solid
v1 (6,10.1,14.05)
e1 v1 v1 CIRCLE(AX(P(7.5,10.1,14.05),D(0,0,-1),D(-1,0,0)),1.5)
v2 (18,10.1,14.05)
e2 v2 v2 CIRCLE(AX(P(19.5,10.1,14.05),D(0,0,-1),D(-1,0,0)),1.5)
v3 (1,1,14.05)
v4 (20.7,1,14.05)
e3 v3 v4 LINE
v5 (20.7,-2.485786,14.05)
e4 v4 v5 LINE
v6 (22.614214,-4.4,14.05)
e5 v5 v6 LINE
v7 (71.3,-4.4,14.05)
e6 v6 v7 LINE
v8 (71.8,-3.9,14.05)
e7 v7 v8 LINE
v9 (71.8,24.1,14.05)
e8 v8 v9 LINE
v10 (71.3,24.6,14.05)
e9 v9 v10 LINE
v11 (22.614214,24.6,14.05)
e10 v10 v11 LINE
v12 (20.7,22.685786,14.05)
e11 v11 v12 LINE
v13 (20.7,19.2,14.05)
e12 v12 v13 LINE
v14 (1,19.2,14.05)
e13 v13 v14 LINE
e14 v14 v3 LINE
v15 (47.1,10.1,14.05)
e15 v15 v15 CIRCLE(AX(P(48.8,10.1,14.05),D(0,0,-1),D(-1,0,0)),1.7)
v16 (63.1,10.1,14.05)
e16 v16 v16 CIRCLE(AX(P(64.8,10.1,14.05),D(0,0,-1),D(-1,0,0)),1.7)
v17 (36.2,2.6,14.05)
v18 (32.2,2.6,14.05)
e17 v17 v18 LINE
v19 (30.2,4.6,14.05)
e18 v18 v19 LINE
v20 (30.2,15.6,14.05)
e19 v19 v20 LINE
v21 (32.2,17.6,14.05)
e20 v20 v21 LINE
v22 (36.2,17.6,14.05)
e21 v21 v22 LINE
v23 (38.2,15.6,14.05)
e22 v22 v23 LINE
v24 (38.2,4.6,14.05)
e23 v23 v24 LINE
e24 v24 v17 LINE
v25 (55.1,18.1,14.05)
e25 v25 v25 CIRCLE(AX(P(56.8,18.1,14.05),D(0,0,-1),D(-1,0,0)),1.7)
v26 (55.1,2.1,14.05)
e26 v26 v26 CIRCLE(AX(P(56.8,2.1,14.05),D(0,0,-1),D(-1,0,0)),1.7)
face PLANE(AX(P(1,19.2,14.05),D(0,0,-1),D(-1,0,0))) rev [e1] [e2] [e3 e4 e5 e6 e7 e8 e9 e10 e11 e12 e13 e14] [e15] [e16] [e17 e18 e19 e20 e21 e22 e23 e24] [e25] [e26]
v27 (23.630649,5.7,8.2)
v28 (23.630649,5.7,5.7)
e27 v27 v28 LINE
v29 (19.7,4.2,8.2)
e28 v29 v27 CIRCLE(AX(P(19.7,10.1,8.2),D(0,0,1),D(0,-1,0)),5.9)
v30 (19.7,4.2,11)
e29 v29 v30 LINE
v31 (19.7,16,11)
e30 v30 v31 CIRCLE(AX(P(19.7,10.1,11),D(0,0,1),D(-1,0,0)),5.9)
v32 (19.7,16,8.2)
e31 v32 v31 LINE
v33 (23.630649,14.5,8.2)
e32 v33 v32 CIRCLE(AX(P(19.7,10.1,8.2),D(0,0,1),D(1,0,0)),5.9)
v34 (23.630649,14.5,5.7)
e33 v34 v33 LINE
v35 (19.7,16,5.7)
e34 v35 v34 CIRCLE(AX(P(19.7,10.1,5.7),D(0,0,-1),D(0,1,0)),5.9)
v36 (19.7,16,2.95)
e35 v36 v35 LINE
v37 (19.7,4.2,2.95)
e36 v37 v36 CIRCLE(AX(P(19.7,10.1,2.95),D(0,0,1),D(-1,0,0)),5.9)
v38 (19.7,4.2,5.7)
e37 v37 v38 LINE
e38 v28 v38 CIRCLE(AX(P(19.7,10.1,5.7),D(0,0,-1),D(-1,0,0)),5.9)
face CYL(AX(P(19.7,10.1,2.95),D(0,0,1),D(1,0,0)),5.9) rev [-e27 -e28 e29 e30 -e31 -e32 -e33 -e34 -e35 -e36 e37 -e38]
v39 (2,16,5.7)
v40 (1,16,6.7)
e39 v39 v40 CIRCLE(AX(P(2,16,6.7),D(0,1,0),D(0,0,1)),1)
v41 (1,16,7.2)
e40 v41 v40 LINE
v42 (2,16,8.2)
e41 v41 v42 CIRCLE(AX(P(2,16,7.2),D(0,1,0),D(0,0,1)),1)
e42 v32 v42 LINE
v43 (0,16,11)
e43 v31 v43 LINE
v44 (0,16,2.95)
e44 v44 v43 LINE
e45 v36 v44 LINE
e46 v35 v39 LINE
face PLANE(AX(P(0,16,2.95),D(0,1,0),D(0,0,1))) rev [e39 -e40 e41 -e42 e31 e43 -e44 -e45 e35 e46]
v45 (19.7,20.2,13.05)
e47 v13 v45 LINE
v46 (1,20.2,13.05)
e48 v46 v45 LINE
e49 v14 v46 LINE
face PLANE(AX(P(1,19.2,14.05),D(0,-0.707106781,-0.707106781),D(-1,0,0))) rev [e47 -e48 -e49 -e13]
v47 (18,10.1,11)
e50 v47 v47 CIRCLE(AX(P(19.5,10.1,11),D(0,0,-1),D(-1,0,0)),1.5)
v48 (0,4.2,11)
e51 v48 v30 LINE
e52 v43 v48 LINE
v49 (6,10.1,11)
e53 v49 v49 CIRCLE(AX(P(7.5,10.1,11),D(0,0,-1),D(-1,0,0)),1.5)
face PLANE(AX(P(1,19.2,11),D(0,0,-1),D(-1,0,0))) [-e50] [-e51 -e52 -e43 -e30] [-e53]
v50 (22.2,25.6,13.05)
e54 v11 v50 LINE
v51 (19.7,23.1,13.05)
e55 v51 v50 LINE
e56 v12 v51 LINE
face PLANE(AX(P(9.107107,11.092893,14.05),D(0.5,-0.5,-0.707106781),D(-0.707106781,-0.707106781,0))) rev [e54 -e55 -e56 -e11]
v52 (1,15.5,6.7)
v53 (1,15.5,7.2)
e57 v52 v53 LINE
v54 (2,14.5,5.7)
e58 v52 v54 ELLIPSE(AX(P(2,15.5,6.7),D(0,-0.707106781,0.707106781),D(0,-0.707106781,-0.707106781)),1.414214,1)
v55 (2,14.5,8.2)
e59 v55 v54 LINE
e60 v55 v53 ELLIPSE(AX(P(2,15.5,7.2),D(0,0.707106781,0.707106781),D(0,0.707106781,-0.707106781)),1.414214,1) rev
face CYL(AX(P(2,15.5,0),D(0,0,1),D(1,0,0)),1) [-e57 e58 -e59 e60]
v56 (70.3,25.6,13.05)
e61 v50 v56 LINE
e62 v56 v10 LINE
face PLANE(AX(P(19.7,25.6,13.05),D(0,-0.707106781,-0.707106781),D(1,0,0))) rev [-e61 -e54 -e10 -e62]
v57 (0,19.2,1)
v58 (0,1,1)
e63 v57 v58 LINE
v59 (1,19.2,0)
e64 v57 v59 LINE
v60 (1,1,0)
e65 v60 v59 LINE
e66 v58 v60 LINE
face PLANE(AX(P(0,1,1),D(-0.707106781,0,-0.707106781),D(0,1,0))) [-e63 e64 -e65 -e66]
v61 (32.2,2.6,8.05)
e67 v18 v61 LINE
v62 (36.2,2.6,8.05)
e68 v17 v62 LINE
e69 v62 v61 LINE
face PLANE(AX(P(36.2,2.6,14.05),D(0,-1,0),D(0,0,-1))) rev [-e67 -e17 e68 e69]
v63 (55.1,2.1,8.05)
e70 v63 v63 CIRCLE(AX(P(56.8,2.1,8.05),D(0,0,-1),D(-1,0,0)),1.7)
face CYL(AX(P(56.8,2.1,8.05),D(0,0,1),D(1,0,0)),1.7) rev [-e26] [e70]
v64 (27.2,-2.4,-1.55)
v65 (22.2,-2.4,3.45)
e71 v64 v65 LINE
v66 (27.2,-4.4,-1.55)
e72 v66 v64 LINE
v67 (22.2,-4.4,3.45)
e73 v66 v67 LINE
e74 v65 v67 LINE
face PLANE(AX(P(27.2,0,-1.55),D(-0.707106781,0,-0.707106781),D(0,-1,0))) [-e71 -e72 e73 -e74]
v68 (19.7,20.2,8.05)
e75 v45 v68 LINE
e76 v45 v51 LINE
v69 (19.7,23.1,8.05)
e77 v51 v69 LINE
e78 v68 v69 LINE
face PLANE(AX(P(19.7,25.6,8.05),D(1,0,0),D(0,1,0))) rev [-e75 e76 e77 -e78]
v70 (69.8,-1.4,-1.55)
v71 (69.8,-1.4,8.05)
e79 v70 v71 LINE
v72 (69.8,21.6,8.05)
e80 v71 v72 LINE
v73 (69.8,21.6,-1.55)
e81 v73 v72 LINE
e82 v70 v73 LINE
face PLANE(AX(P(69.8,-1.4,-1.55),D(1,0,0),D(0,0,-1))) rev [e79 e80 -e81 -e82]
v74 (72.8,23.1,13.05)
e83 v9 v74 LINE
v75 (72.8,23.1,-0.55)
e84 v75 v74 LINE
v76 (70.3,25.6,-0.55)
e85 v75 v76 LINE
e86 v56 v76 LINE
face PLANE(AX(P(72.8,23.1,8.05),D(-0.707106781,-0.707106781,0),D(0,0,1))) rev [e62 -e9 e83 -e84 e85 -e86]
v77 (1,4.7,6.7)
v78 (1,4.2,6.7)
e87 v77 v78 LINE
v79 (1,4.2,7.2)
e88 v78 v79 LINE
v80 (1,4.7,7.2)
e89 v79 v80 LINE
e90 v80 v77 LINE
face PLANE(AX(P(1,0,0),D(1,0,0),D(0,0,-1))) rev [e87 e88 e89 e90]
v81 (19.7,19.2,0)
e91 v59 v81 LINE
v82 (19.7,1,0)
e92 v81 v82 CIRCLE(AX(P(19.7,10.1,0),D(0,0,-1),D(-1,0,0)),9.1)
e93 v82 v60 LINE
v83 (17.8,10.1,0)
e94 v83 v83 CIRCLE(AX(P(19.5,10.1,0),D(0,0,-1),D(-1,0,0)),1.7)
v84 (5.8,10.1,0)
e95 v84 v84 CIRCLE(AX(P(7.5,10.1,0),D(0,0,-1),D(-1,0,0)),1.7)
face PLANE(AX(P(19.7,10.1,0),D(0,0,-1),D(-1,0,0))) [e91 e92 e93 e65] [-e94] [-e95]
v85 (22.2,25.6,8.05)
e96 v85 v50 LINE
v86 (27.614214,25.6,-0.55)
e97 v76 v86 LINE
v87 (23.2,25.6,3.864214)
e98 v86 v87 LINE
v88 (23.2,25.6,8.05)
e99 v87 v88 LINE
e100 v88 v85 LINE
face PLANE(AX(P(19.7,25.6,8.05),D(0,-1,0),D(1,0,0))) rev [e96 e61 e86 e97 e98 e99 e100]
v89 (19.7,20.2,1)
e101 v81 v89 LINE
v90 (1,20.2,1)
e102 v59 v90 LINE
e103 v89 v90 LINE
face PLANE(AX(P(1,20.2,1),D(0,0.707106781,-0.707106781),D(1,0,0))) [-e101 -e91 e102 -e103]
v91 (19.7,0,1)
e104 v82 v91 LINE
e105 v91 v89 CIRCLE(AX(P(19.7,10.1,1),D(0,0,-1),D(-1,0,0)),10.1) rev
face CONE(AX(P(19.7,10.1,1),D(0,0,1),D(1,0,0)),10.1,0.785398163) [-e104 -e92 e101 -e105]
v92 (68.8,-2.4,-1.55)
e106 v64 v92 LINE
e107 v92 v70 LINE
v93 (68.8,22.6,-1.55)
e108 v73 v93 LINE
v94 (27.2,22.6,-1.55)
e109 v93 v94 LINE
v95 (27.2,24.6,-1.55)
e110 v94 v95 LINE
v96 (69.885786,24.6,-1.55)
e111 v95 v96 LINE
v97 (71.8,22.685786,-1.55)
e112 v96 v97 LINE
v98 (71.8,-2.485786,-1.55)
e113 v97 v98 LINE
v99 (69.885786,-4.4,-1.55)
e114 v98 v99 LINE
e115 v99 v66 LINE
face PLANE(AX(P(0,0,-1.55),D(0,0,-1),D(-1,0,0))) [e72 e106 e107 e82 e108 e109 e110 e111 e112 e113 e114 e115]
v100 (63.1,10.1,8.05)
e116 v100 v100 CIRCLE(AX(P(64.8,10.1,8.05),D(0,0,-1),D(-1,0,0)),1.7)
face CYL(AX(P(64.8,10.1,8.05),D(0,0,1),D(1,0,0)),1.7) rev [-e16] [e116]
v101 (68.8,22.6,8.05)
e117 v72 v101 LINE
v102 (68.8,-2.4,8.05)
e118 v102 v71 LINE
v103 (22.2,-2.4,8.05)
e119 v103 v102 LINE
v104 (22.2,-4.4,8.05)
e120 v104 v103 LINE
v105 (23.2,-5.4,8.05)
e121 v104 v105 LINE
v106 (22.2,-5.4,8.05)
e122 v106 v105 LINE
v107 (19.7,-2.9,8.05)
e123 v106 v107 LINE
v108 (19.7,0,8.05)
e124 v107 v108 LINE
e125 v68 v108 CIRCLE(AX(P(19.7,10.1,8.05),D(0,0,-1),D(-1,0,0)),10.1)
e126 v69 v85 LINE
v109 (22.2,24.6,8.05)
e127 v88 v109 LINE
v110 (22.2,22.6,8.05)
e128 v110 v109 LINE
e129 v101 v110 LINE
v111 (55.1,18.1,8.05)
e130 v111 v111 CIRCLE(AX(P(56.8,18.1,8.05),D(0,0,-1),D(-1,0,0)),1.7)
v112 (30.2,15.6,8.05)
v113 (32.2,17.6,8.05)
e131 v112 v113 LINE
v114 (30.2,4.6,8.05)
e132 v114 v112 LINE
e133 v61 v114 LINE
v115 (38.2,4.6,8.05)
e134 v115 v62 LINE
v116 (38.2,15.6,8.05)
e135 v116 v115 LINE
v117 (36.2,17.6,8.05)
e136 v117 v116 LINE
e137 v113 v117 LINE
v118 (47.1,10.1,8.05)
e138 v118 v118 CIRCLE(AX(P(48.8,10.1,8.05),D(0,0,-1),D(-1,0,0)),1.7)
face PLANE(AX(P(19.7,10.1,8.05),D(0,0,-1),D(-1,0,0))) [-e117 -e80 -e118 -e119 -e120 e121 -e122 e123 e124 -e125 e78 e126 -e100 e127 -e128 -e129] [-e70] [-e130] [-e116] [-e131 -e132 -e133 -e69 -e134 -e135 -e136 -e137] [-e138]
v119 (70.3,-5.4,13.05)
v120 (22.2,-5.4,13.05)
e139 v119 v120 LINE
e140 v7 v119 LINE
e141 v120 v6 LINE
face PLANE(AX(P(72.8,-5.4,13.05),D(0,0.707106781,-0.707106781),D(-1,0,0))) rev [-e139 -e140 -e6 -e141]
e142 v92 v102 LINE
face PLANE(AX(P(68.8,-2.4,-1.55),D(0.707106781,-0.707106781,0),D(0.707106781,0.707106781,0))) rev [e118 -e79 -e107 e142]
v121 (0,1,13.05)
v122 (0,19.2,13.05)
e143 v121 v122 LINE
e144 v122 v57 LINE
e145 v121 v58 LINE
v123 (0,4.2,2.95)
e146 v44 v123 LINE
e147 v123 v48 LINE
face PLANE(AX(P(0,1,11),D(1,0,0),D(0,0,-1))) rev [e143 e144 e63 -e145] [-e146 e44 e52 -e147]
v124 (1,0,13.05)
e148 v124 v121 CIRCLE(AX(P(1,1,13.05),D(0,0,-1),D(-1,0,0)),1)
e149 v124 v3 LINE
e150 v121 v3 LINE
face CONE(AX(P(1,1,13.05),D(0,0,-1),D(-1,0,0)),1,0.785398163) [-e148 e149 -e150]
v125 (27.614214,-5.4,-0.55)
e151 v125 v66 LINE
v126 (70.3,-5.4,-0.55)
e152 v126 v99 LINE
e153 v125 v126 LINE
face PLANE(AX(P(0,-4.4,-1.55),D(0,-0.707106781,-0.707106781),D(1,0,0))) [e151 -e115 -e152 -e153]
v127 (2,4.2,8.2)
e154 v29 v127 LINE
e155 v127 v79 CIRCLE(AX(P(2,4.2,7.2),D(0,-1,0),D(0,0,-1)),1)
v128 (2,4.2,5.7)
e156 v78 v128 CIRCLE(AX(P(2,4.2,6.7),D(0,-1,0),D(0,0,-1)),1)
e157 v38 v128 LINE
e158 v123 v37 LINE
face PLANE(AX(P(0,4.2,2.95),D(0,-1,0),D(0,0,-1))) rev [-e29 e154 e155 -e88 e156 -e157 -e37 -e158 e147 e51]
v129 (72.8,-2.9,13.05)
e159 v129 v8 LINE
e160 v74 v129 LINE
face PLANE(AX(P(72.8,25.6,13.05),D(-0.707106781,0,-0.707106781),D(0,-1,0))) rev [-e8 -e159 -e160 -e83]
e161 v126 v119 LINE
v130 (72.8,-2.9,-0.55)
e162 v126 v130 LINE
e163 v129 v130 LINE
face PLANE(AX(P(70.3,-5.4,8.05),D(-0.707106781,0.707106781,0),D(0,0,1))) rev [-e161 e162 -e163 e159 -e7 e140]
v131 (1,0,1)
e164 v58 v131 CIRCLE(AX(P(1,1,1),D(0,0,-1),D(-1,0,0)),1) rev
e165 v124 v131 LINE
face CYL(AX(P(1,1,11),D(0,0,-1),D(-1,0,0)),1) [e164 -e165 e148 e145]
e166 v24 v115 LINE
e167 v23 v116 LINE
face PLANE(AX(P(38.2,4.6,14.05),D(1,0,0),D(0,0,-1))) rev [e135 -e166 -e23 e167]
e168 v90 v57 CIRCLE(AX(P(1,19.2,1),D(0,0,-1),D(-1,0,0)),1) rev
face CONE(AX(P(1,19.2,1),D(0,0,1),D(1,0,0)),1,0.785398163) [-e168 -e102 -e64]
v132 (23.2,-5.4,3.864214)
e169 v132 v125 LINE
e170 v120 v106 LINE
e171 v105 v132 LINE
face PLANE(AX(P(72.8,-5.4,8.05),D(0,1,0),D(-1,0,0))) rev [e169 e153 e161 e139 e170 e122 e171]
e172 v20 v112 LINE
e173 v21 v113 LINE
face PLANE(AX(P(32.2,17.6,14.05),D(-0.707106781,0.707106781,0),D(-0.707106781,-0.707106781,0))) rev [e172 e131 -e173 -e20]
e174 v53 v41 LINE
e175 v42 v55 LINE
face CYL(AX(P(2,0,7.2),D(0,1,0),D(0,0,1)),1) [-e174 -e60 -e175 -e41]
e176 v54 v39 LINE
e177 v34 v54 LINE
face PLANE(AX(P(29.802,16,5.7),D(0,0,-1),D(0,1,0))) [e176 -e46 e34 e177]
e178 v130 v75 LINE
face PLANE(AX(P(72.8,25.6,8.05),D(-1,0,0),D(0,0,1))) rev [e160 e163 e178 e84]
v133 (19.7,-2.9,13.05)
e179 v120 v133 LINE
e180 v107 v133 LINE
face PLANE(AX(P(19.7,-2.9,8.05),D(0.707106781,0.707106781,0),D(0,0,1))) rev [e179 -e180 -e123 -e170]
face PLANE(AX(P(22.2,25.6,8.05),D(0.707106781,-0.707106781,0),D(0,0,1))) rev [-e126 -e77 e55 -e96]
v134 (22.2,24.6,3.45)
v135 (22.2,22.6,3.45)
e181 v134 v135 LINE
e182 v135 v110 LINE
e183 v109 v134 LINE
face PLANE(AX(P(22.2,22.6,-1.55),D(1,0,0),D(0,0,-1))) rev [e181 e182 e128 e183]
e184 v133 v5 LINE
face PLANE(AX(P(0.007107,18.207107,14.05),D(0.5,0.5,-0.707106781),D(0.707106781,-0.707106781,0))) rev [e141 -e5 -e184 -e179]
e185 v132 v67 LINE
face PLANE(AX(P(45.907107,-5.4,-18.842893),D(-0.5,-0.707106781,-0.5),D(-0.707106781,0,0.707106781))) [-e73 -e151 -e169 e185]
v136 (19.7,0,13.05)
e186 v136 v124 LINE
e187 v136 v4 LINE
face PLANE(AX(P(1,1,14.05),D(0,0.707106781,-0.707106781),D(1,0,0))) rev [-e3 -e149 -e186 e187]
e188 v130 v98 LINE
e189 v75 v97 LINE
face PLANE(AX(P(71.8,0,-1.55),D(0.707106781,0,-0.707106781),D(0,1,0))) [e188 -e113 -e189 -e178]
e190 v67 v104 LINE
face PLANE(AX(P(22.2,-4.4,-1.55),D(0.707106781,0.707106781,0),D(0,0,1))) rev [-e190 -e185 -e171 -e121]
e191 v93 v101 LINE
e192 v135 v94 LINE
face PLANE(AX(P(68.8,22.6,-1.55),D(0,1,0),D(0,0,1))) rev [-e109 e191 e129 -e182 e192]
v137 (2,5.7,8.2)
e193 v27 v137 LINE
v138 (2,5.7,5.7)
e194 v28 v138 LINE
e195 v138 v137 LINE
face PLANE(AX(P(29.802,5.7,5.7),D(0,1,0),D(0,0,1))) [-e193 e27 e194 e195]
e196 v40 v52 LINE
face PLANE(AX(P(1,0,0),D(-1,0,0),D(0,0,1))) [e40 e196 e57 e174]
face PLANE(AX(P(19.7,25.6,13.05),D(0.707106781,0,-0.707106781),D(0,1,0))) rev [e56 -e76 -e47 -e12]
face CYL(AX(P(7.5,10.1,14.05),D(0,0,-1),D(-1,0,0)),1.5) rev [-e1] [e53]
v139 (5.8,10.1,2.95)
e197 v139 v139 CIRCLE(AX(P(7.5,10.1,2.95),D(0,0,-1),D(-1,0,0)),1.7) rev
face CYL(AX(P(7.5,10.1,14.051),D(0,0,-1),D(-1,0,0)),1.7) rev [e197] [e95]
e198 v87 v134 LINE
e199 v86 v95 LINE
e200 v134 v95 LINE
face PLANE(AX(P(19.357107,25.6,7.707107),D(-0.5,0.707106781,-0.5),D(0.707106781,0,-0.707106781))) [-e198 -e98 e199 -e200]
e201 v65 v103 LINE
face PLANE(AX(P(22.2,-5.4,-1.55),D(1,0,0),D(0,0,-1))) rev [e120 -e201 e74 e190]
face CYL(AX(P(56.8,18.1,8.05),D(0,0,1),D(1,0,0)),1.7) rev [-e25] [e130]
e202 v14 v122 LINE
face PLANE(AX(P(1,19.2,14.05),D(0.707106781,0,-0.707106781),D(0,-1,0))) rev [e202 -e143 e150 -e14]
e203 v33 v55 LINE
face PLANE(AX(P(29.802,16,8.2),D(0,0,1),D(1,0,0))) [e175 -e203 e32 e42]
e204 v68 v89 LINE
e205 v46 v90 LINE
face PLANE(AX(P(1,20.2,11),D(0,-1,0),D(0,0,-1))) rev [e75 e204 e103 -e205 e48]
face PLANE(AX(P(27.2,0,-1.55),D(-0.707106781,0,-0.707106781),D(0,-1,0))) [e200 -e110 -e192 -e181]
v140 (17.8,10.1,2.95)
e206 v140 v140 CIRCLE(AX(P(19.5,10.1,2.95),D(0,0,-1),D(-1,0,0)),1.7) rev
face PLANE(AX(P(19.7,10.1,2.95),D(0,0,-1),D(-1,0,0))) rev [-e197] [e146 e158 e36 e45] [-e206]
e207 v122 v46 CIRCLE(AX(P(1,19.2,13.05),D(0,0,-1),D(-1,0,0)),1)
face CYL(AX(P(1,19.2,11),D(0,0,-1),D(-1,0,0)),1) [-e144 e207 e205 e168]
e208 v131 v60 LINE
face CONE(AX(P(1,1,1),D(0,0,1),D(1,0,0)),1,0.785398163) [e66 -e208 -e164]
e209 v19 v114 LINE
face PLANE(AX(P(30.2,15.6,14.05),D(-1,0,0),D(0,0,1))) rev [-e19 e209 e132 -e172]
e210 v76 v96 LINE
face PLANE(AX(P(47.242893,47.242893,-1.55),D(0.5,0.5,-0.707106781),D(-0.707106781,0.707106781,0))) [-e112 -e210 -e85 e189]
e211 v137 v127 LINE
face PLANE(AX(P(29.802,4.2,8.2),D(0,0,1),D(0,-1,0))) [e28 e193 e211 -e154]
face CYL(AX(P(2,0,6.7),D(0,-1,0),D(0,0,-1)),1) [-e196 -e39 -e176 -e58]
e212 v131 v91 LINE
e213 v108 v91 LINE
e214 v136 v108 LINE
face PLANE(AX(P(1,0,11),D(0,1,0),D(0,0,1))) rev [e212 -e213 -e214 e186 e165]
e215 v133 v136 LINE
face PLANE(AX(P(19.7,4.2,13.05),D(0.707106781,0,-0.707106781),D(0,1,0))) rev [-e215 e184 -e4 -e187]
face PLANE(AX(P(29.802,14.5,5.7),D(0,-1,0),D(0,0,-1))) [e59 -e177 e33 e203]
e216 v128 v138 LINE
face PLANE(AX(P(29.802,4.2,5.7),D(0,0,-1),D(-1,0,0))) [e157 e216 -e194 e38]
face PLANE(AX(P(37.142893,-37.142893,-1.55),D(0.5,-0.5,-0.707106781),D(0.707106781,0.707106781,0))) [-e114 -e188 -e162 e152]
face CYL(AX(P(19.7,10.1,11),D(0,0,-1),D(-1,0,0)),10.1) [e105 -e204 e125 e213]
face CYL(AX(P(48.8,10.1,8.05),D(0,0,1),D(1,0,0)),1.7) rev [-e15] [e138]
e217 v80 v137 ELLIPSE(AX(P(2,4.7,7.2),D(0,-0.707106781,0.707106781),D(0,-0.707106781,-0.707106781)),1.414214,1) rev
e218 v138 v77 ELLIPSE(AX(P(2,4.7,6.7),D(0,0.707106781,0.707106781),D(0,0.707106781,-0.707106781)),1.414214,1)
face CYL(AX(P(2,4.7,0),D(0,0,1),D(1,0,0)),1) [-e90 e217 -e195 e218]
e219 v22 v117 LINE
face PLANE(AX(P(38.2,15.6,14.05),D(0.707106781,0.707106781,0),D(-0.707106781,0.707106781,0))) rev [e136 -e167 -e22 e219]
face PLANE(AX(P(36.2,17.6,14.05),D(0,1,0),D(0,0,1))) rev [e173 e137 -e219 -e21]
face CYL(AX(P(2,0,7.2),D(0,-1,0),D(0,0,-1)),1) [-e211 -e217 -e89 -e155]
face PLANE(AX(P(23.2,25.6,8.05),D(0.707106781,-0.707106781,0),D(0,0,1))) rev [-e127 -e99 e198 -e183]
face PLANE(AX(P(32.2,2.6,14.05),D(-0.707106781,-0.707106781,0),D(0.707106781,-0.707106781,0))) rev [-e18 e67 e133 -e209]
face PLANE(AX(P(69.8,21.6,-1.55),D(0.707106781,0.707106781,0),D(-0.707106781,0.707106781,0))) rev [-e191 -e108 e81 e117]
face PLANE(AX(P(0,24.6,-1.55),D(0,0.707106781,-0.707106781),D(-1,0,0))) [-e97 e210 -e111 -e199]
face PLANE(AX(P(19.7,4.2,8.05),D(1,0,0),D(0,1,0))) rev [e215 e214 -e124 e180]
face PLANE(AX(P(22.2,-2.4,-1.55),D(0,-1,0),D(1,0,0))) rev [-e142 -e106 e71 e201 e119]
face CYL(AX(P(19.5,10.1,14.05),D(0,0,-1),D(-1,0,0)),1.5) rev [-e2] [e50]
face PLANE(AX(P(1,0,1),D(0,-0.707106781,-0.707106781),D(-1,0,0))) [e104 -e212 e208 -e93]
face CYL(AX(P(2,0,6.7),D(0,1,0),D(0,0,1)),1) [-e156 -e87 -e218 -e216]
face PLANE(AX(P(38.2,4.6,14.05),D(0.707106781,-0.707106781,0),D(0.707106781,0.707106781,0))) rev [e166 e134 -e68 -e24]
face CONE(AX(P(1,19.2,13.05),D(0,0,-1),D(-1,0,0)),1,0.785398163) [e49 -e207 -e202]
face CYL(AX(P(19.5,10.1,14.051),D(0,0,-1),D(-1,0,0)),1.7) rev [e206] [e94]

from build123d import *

# Parameters (mm, degrees)
BOSS_EXTRUDE1_DEPTH     = 11
CUT_EXTRUDE2_DEPTH      = 8.05
BOSS_EXTRUDE2_REACH     = 38.858
SKETCH4_W               = 2.5
SKETCH4_H               = 1.5
BOSS_EXTRUDE5_DEPTH     = 3.05
FILLET3_R               = 1
SKETCH8_R               = 1.7
BOSS_EXTRUDE3_DEPTH     = 6
CHAMFER1_SIZE           = 2.5
CUT_EXTRUDE5_REACH      = 80.439
SKETCH10_R              = 1.7
BOSS_EXTRUDE4_DEPTH     = 9.6
CHAMFER3_SIZE           = 5
CHAMFER2_SIZE           = 1
CUT_EXTRUDE6_DEPTH      = 78.764773516
CUT_EXTRUDE6_DEPTH_BACK = 78.764773516
SKETCH15_R              = 1.5
CUT_EXTRUDE7_DEPTH      = 79.438526886


with BuildPart() as part:
    # Sketch1 → Boss-Extrude1 (new body)
    with BuildSketch(Plane.XY):
        with BuildLine():
            Line((1, 0), (19.7, 0))
            ThreePointArc((19.7, 0), (29.8, 10.1), (19.7, 20.2))
            Line((19.7, 20.2), (1, 20.2))
            ThreePointArc((1, 20.2), (0.292893219, 19.907106781), (0, 19.2))
            Line((0, 19.2), (0, 1))
            ThreePointArc((0, 1), (0.292893219, 0.292893219), (1, 0))
        make_face()
    extrude(amount=BOSS_EXTRUDE1_DEPTH)

    # Sketch3 → Cut-Extrude2 (cut)
    with BuildSketch(Plane.XY.offset(11)):
        with BuildLine():
            Line((0, 16), (19.7, 16))
            ThreePointArc((19.7, 16), (25.6, 10.1), (19.7, 4.2))
            Line((19.7, 4.2), (0, 4.2))
            Line((0, 4.2), (0, 16))
        make_face()
    extrude(amount=-CUT_EXTRUDE2_DEPTH, mode=Mode.SUBTRACT)

    # Sketch4 → Boss-Extrude2 (add, up to next)
    with BuildSketch(Plane.ZY.offset(-1), mode=Mode.PRIVATE) as boss_extrude2_sk1:
        with Locations((6.95, 15.25)):
            Rectangle(SKETCH4_W, SKETCH4_H)
    boss_extrude2_tool1 = extrude(boss_extrude2_sk1.sketch, amount=-BOSS_EXTRUDE2_REACH, mode=Mode.PRIVATE) - part.part
    # Sketch4 → Boss-Extrude2 (add, up to next)
    with BuildSketch(Plane.ZY.offset(-1), mode=Mode.PRIVATE) as boss_extrude2_sk2:
        with Locations((6.95, 4.95)):
            Rectangle(SKETCH4_W, SKETCH4_H)
    boss_extrude2_tool2 = extrude(boss_extrude2_sk2.sketch, amount=-BOSS_EXTRUDE2_REACH, mode=Mode.PRIVATE) - part.part
    add(boss_extrude2_tool1.solids().sort_by_distance((1, 15.25, 6.95))[0])
    add(boss_extrude2_tool2.solids().sort_by_distance((1, 4.95, 6.95))[0])

    # Sketch14 → Boss-Extrude5 (add)
    with BuildSketch(Plane.XY.offset(11)):
        with BuildLine():
            Line((0, 19.2), (0, 1))
            ThreePointArc((0, 1), (0.292893219, 0.292893219), (1, 0))
            Line((1, 0), (19.7, 0))
            ThreePointArc((19.7, 0), (29.8, 10.1), (19.7, 20.2))
            Line((19.7, 20.2), (1, 20.2))
            ThreePointArc((1, 20.2), (0.292893219, 19.907106781), (0, 19.2))
        make_face()
    extrude(amount=BOSS_EXTRUDE5_DEPTH)

    # Fillet3
    fillet3_edges = [part.edges().sort_by_distance(p)[0] for p in [
        (1, 15.25, 5.7),
        (1, 14.5, 6.95),
        (1, 15.25, 8.2),
        (1, 4.95, 5.7),
        (1, 4.95, 8.2),
        (1, 5.7, 6.95),
    ]]
    fillet(fillet3_edges, radius=FILLET3_R)

    # Sketch8 → Boss-Extrude3 (add)
    with BuildSketch(Plane(origin=(0, 0, 14.05), x_dir=(-1, 0, 0), z_dir=(0, 0, -1))):
        with BuildLine():
            Line((-19.7, 25.6), (-72.8, 25.6))
            Line((-72.8, 25.6), (-72.8, -5.4))
            Line((-72.8, -5.4), (-19.7, -5.4))
            Line((-19.7, -5.4), (-19.7, 4.2))
            ThreePointArc((-19.7, 4.2), (-25.6, 10.1), (-19.7, 16))
            Line((-19.7, 16), (-19.7, 25.6))
        make_face()
        with Locations((-64.8, 10.1)):
            Circle(SKETCH8_R, mode=Mode.SUBTRACT)
        with Locations((-56.8, 2.1)):
            Circle(SKETCH8_R, mode=Mode.SUBTRACT)
        with Locations((-48.8, 10.1)):
            Circle(SKETCH8_R, mode=Mode.SUBTRACT)
        with Locations((-56.8, 18.1)):
            Circle(SKETCH8_R, mode=Mode.SUBTRACT)
    extrude(amount=BOSS_EXTRUDE3_DEPTH)

    # Chamfer1
    chamfer1_edges = [part.edges().sort_by_distance(p)[0] for p in [
        (19.7, -5.4, 11.05),
        (19.7, 25.6, 11.05),
        (72.8, 25.6, 11.05),
        (72.8, -5.4, 11.05),
    ]]
    chamfer(chamfer1_edges, length=CHAMFER1_SIZE)

    # Sketch10 → Cut-Extrude5 (cut, up to next)
    with BuildSketch(Plane(origin=(0, 0, 0), x_dir=(-1, 0, 0), z_dir=(0, 0, -1)), mode=Mode.PRIVATE) as cut_extrude5_sk1:
        with Locations((-7.5, 10.1)):
            Circle(SKETCH10_R)
    cut_extrude5_tool1 = extrude(cut_extrude5_sk1.sketch, amount=-CUT_EXTRUDE5_REACH, mode=Mode.PRIVATE) & part.part
    # Sketch10 → Cut-Extrude5 (cut, up to next)
    with BuildSketch(Plane(origin=(0, 0, 0), x_dir=(-1, 0, 0), z_dir=(0, 0, -1)), mode=Mode.PRIVATE) as cut_extrude5_sk2:
        with Locations((-19.5, 10.1)):
            Circle(SKETCH10_R)
    cut_extrude5_tool2 = extrude(cut_extrude5_sk2.sketch, amount=-CUT_EXTRUDE5_REACH, mode=Mode.PRIVATE) & part.part
    add(cut_extrude5_tool1.solids().sort_by_distance((7.5, 10.1, 0))[0], mode=Mode.SUBTRACT)
    add(cut_extrude5_tool2.solids().sort_by_distance((19.5, 10.1, 0))[0], mode=Mode.SUBTRACT)

    # Sketch11 → Boss-Extrude4 (add)
    with BuildSketch(Plane(origin=(0, 0, 8.05), x_dir=(-1, 0, 0), z_dir=(0, 0, -1))):
        Polygon((-22.2, 25.6), (-70.3, 25.6), (-72.8, 23.1), (-72.8, -2.9), (-70.3, -5.4), (-22.2, -5.4), (-22.2, -2.4), (-68.8, -2.4), (-69.8, -1.4), (-69.8, 21.6), (-68.8, 22.6), (-22.2, 22.6), align=None)
    extrude(amount=BOSS_EXTRUDE4_DEPTH)

    # Chamfer3
    chamfer3_edges = [part.edges().sort_by_distance(p)[0] for p in [
        (22.2, 24.1, -1.55),
        (22.2, -3.9, -1.55),
    ]]
    chamfer(chamfer3_edges, length=CHAMFER3_SIZE)

    # Chamfer2
    chamfer2_edges = [part.edges().sort_by_distance(p)[0] for p in [
        (48.75, 25.6, -1.55),
        (46.25, -5.4, 14.05),
        (72.8, 10.1, 14.05),
        (72.8, 10.1, -1.55),
        (46.25, 25.6, 14.05),
        (22.2, 25.6, 5.75),
        (22.2, -5.4, 5.75),
        (24.7, -5.4, 0.95),
        (24.7, 25.6, 0.95),
        (48.75, -5.4, -1.55),
        (71.55, -4.15, -1.55),
        (71.55, 24.35, -1.55),
        (10.35, 0, 0),
        (29.8, 10.1, 0),
        (10.35, 20.2, 0),
        (0.292893219, 19.907106781, 0),
        (0.292893219, 0.292893219, 0),
        (0, 10.1, 0),
        (0, 10.1, 14.05),
        (10.35, 0, 14.05),
        (19.7, -1.45, 14.05),
        (20.95, -4.15, 14.05),
        (0.292893219, 0.292893219, 14.05),
        (0.292893219, 19.907106781, 14.05),
        (10.35, 20.2, 14.05),
        (19.7, 21.65, 14.05),
        (20.95, 24.35, 14.05),
    ]]
    chamfer(chamfer2_edges, length=CHAMFER2_SIZE - 0.0001)  # a hair under: the kernel refuses the full size

    # Sketch12 → Cut-Extrude6 (cut, two sides: drawn at the far end of the back side and taken through both)
    with BuildSketch(Plane(origin=(0, 0, 8.05), x_dir=(-1, 0, 0), z_dir=(0, 0, -1)).offset(-CUT_EXTRUDE6_DEPTH_BACK)):
        Polygon((-38.2, 4.6), (-38.2, 15.6), (-36.2, 17.6), (-32.2, 17.6), (-30.2, 15.6), (-30.2, 4.6), (-32.2, 2.6), (-36.2, 2.6), align=None)
    extrude(amount=CUT_EXTRUDE6_DEPTH + CUT_EXTRUDE6_DEPTH_BACK, mode=Mode.SUBTRACT)

    # Sketch15 → Cut-Extrude7 (cut, through all)
    with BuildSketch(Plane(origin=(0, 0, 0), x_dir=(-1, 0, 0), z_dir=(0, 0, -1))):
        with Locations((-19.5, 10.1)):
            Circle(SKETCH15_R)
        with Locations((-7.5, 10.1)):
            Circle(SKETCH15_R)
    extrude(amount=-CUT_EXTRUDE7_DEPTH, mode=Mode.SUBTRACT)


solid = part.part
